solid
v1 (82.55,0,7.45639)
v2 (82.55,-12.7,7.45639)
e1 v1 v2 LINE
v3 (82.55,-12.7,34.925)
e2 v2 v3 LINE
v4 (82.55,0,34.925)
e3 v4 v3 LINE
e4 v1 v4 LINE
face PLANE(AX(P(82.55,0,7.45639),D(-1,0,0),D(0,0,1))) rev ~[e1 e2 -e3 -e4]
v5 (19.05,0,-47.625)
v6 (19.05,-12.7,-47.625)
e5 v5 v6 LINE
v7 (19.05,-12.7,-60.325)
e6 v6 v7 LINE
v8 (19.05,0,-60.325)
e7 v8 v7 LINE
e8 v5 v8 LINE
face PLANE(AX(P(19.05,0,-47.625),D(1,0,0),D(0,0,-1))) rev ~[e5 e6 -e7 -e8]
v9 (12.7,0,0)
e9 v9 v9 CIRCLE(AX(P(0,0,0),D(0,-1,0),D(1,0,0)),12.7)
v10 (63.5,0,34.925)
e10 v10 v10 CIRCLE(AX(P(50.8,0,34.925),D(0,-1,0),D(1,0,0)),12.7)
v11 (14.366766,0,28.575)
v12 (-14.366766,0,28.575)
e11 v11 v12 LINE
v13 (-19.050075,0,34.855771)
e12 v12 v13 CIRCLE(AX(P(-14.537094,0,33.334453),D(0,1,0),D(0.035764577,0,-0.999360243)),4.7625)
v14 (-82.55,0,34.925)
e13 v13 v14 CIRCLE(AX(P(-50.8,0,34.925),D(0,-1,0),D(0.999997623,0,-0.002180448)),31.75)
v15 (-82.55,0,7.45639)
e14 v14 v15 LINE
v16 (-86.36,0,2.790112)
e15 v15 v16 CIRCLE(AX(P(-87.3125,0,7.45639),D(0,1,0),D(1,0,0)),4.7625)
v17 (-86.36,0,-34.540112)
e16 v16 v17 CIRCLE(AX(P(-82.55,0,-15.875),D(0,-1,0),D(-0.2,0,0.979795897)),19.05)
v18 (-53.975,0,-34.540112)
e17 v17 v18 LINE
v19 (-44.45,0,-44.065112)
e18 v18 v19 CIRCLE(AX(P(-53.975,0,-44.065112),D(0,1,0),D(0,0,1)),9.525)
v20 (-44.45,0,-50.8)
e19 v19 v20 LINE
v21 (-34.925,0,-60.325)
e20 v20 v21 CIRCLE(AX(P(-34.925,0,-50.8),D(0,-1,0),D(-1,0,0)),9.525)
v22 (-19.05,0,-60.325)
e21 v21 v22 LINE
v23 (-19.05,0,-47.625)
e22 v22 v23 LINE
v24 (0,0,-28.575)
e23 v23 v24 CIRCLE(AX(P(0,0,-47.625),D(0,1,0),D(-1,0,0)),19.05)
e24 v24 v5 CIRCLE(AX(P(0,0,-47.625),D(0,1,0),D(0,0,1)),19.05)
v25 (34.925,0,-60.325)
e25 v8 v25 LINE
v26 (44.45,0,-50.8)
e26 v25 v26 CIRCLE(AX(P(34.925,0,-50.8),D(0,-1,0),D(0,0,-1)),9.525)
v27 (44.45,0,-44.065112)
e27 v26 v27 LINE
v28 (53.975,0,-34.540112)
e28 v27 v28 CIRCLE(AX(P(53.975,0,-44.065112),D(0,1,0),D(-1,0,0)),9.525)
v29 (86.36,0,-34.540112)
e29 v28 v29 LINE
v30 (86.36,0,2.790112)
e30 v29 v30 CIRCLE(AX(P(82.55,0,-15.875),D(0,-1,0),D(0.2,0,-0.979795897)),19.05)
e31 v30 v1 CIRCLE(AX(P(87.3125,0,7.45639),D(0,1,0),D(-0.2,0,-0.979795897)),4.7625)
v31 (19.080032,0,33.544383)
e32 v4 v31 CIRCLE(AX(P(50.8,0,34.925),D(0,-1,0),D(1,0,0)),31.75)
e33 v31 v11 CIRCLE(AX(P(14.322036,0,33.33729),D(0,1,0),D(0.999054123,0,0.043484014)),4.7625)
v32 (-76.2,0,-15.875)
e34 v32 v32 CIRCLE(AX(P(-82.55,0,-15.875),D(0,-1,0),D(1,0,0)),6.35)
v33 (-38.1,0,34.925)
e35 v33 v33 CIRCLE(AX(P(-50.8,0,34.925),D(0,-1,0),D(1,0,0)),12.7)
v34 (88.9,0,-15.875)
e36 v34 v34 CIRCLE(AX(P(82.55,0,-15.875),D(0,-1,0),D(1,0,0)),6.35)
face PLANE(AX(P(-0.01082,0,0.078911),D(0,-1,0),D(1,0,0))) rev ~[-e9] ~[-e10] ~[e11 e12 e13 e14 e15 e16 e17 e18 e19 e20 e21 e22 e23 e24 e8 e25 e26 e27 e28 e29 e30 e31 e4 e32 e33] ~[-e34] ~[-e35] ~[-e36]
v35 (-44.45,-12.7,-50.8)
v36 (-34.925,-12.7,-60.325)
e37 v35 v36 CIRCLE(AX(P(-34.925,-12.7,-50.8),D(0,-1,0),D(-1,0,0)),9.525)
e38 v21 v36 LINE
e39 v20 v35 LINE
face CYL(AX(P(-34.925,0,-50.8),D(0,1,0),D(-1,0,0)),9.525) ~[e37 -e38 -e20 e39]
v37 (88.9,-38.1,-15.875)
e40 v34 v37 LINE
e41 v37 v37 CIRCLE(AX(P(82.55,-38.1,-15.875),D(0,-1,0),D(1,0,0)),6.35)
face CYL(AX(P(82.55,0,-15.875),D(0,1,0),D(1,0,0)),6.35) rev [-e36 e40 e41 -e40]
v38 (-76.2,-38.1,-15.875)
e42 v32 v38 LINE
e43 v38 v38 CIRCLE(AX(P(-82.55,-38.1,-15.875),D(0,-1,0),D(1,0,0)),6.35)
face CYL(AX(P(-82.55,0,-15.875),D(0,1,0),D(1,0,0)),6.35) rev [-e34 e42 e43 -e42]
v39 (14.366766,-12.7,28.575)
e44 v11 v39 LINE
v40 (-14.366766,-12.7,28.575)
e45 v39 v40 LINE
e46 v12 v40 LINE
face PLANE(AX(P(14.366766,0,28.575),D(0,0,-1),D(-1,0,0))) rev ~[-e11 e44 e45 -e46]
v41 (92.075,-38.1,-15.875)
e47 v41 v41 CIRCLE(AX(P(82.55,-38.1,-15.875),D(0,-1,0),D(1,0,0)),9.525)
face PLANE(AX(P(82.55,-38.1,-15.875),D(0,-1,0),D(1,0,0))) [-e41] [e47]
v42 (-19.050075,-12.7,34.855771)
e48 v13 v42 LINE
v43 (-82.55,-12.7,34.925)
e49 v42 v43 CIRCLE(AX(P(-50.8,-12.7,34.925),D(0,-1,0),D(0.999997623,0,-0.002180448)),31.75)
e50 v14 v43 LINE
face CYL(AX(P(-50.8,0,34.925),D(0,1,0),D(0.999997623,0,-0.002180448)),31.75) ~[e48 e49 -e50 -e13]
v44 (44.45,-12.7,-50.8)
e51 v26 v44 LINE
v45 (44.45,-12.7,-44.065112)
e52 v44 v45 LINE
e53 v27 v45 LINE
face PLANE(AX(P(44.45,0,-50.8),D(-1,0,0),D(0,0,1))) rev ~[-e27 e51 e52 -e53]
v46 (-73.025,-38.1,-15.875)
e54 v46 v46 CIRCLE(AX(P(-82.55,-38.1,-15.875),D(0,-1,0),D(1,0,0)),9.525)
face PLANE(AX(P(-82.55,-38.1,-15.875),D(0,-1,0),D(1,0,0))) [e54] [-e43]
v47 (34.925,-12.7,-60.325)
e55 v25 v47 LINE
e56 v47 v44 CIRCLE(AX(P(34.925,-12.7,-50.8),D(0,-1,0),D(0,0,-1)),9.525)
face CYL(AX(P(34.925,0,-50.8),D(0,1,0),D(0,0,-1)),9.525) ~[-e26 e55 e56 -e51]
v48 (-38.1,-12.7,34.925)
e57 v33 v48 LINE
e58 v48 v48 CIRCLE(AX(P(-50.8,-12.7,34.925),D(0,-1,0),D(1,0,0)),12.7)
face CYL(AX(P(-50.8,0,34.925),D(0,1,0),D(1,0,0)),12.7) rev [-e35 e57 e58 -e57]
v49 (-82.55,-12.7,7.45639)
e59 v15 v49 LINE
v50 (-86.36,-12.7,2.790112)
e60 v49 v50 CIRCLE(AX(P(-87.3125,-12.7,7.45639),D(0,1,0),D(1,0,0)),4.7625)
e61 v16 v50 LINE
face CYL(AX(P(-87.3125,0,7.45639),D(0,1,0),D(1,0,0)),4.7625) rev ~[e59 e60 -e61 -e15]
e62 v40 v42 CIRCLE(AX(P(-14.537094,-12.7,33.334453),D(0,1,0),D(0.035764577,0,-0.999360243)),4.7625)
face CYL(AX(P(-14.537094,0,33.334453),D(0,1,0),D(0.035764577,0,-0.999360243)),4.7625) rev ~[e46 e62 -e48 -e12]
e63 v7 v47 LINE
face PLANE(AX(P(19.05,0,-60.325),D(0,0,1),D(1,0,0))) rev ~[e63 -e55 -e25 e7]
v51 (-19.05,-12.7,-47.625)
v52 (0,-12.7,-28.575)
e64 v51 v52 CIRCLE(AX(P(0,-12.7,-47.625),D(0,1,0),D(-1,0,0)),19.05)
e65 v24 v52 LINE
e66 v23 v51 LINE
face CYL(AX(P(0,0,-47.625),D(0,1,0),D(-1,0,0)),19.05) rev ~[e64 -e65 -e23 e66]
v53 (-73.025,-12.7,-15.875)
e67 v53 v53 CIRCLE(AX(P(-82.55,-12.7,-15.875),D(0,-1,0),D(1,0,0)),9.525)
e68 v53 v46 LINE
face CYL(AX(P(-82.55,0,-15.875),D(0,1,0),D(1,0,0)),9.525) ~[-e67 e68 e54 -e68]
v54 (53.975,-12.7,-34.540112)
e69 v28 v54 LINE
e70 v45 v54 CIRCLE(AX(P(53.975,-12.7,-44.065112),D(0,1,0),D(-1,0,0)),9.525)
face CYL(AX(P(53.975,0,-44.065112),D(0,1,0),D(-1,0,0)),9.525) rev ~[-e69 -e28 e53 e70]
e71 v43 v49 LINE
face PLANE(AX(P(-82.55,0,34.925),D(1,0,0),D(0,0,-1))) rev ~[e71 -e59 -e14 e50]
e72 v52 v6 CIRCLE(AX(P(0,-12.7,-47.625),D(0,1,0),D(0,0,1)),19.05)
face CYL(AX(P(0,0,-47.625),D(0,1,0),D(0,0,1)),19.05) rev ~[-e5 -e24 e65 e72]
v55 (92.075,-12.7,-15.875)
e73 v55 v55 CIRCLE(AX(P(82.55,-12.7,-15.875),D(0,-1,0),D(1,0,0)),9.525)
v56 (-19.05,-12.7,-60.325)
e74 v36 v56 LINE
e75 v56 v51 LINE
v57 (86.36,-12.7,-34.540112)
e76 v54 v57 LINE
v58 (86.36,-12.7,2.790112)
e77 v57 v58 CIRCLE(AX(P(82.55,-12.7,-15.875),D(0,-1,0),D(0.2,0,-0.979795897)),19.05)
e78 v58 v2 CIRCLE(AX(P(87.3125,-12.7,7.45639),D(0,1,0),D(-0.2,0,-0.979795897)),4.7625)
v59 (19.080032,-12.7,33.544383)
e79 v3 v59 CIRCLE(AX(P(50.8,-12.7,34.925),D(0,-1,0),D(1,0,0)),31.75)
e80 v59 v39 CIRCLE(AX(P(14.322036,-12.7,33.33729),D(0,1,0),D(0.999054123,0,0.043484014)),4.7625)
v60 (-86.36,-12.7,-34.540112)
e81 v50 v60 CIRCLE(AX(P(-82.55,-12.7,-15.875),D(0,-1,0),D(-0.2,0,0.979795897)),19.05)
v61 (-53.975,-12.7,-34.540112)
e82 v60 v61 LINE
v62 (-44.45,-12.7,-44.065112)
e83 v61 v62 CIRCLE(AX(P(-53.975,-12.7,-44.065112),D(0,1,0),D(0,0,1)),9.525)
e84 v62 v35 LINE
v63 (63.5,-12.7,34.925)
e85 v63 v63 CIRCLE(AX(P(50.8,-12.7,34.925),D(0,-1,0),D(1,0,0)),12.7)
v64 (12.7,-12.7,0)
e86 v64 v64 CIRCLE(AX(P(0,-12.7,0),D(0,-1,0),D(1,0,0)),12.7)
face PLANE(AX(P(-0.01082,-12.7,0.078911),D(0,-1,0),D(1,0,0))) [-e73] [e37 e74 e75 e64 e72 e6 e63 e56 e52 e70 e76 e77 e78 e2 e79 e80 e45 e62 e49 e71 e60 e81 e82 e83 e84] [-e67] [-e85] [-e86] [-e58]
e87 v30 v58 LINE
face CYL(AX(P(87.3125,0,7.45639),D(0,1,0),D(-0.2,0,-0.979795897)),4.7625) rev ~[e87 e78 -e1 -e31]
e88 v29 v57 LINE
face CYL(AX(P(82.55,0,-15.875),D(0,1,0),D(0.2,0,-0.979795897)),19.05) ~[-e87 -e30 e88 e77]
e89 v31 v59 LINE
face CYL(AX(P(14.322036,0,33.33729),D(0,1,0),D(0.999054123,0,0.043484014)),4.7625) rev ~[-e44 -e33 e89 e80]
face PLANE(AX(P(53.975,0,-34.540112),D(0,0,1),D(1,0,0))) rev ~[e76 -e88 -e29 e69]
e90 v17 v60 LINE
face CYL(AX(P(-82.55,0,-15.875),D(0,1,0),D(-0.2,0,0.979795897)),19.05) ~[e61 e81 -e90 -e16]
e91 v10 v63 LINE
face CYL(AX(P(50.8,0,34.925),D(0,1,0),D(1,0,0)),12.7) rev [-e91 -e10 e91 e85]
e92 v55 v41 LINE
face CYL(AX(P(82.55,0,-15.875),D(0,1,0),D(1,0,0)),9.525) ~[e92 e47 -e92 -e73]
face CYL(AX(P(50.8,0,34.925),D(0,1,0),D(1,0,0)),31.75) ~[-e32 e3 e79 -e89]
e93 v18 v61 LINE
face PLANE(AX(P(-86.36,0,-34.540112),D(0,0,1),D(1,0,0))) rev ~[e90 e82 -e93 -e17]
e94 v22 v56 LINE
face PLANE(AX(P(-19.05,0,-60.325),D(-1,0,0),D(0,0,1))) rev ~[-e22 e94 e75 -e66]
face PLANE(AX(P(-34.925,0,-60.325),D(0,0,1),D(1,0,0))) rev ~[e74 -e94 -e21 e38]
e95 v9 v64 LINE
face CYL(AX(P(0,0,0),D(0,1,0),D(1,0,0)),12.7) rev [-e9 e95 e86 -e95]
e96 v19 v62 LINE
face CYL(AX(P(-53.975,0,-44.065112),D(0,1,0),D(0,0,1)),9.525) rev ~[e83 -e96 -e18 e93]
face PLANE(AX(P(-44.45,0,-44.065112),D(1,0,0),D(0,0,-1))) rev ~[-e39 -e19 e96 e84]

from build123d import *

# Parameters (mm, degrees)
F0_R     = 9.525
F0_R_2   = 12.7
F1_DEPTH = 12.7
F0_R_3   = 6.35
F2_DEPTH = 38.1


with BuildPart() as f1:
    # F0 (on Front) → F1 (new body)
    with BuildSketch(Plane.XZ):
        with BuildLine():
            ThreePointArc((19.0800315969, 33.5443825636), (17.7775003101, 30.0599167658), (14.3667655142, 28.575))
            Line((14.3667655142, 28.575), (-14.3667655142, 28.575))
            ThreePointArc((-14.3667655142, 28.575), (-18.3550358696, 30.4875726696), (-19.0500754755, 34.8557707639))
            ThreePointArc((-19.0500754755, 34.8557707639), (-50.7653853614, 66.6749811311), (-82.55, 34.925))
            Line((-82.55, 34.925), (-82.55, 7.4563898))
            ThreePointArc((-82.55, 7.4563898), (-83.6234833627, 4.4443203287), (-86.36, 2.79011184))
            ThreePointArc((-86.36, 2.79011184), (-101.6, -15.875), (-86.36, -34.54011184))
            Line((-86.36, -34.54011184), (-53.975, -34.54011184))
            ThreePointArc((-53.975, -34.54011184), (-47.2398079092, -37.3299197492), (-44.45, -44.06511184))
            Line((-44.45, -44.06511184), (-44.45, -50.8))
            ThreePointArc((-44.45, -50.8), (-41.6601920908, -57.5351920908), (-34.925, -60.325))
            Line((-34.925, -60.325), (-19.05, -60.325))
            Line((-19.05, -60.325), (-19.05, -47.625))
            ThreePointArc((-19.05, -47.625), (-13.4703841816, -34.1546158184), (0, -28.575))
            ThreePointArc((0, -28.575), (13.4703841816, -34.1546158184), (19.05, -47.625))
            Line((19.05, -47.625), (19.05, -60.325))
            Line((19.05, -60.325), (34.925, -60.325))
            ThreePointArc((34.925, -60.325), (41.6601920908, -57.5351920908), (44.45, -50.8))
            Line((44.45, -50.8), (44.45, -44.06511184))
            ThreePointArc((44.45, -44.06511184), (47.2398079092, -37.3299197492), (53.975, -34.54011184))
            Line((53.975, -34.54011184), (86.36, -34.54011184))
            ThreePointArc((86.36, -34.54011184), (101.6, -15.875), (86.36, 2.79011184))
            ThreePointArc((86.36, 2.79011184), (83.6234833627, 4.4443203287), (82.55, 7.4563898))
            Line((82.55, 7.4563898), (82.55, 34.925))
            ThreePointArc((82.55, 34.925), (50.1095279871, 66.6674912129), (19.0800315969, 33.5443825636))
        make_face()
        with Locations((-82.55, -15.875)):
            Circle(F0_R, mode=Mode.SUBTRACT)
        Circle(F0_R_2, mode=Mode.SUBTRACT)
        with Locations((82.55, -15.875)):
            Circle(F0_R, mode=Mode.SUBTRACT)
        with Locations((-50.8, 34.925)):
            Circle(F0_R_2, mode=Mode.SUBTRACT)
        with Locations((50.8, 34.925)):
            Circle(F0_R_2, mode=Mode.SUBTRACT)
    extrude(amount=F1_DEPTH)

    # F0 (on Front) → F2 (join)
    with BuildSketch(Plane.XZ):
        with Locations((-82.55, -15.875)):
            Circle(F0_R)
        with Locations((-82.55, -15.875)):
            Circle(F0_R_3, mode=Mode.SUBTRACT)
        with Locations((82.55, -15.875)):
            Circle(F0_R)
        with Locations((82.55, -15.875)):
            Circle(F0_R_3, mode=Mode.SUBTRACT)
    extrude(amount=F2_DEPTH)


solid = f1.part
